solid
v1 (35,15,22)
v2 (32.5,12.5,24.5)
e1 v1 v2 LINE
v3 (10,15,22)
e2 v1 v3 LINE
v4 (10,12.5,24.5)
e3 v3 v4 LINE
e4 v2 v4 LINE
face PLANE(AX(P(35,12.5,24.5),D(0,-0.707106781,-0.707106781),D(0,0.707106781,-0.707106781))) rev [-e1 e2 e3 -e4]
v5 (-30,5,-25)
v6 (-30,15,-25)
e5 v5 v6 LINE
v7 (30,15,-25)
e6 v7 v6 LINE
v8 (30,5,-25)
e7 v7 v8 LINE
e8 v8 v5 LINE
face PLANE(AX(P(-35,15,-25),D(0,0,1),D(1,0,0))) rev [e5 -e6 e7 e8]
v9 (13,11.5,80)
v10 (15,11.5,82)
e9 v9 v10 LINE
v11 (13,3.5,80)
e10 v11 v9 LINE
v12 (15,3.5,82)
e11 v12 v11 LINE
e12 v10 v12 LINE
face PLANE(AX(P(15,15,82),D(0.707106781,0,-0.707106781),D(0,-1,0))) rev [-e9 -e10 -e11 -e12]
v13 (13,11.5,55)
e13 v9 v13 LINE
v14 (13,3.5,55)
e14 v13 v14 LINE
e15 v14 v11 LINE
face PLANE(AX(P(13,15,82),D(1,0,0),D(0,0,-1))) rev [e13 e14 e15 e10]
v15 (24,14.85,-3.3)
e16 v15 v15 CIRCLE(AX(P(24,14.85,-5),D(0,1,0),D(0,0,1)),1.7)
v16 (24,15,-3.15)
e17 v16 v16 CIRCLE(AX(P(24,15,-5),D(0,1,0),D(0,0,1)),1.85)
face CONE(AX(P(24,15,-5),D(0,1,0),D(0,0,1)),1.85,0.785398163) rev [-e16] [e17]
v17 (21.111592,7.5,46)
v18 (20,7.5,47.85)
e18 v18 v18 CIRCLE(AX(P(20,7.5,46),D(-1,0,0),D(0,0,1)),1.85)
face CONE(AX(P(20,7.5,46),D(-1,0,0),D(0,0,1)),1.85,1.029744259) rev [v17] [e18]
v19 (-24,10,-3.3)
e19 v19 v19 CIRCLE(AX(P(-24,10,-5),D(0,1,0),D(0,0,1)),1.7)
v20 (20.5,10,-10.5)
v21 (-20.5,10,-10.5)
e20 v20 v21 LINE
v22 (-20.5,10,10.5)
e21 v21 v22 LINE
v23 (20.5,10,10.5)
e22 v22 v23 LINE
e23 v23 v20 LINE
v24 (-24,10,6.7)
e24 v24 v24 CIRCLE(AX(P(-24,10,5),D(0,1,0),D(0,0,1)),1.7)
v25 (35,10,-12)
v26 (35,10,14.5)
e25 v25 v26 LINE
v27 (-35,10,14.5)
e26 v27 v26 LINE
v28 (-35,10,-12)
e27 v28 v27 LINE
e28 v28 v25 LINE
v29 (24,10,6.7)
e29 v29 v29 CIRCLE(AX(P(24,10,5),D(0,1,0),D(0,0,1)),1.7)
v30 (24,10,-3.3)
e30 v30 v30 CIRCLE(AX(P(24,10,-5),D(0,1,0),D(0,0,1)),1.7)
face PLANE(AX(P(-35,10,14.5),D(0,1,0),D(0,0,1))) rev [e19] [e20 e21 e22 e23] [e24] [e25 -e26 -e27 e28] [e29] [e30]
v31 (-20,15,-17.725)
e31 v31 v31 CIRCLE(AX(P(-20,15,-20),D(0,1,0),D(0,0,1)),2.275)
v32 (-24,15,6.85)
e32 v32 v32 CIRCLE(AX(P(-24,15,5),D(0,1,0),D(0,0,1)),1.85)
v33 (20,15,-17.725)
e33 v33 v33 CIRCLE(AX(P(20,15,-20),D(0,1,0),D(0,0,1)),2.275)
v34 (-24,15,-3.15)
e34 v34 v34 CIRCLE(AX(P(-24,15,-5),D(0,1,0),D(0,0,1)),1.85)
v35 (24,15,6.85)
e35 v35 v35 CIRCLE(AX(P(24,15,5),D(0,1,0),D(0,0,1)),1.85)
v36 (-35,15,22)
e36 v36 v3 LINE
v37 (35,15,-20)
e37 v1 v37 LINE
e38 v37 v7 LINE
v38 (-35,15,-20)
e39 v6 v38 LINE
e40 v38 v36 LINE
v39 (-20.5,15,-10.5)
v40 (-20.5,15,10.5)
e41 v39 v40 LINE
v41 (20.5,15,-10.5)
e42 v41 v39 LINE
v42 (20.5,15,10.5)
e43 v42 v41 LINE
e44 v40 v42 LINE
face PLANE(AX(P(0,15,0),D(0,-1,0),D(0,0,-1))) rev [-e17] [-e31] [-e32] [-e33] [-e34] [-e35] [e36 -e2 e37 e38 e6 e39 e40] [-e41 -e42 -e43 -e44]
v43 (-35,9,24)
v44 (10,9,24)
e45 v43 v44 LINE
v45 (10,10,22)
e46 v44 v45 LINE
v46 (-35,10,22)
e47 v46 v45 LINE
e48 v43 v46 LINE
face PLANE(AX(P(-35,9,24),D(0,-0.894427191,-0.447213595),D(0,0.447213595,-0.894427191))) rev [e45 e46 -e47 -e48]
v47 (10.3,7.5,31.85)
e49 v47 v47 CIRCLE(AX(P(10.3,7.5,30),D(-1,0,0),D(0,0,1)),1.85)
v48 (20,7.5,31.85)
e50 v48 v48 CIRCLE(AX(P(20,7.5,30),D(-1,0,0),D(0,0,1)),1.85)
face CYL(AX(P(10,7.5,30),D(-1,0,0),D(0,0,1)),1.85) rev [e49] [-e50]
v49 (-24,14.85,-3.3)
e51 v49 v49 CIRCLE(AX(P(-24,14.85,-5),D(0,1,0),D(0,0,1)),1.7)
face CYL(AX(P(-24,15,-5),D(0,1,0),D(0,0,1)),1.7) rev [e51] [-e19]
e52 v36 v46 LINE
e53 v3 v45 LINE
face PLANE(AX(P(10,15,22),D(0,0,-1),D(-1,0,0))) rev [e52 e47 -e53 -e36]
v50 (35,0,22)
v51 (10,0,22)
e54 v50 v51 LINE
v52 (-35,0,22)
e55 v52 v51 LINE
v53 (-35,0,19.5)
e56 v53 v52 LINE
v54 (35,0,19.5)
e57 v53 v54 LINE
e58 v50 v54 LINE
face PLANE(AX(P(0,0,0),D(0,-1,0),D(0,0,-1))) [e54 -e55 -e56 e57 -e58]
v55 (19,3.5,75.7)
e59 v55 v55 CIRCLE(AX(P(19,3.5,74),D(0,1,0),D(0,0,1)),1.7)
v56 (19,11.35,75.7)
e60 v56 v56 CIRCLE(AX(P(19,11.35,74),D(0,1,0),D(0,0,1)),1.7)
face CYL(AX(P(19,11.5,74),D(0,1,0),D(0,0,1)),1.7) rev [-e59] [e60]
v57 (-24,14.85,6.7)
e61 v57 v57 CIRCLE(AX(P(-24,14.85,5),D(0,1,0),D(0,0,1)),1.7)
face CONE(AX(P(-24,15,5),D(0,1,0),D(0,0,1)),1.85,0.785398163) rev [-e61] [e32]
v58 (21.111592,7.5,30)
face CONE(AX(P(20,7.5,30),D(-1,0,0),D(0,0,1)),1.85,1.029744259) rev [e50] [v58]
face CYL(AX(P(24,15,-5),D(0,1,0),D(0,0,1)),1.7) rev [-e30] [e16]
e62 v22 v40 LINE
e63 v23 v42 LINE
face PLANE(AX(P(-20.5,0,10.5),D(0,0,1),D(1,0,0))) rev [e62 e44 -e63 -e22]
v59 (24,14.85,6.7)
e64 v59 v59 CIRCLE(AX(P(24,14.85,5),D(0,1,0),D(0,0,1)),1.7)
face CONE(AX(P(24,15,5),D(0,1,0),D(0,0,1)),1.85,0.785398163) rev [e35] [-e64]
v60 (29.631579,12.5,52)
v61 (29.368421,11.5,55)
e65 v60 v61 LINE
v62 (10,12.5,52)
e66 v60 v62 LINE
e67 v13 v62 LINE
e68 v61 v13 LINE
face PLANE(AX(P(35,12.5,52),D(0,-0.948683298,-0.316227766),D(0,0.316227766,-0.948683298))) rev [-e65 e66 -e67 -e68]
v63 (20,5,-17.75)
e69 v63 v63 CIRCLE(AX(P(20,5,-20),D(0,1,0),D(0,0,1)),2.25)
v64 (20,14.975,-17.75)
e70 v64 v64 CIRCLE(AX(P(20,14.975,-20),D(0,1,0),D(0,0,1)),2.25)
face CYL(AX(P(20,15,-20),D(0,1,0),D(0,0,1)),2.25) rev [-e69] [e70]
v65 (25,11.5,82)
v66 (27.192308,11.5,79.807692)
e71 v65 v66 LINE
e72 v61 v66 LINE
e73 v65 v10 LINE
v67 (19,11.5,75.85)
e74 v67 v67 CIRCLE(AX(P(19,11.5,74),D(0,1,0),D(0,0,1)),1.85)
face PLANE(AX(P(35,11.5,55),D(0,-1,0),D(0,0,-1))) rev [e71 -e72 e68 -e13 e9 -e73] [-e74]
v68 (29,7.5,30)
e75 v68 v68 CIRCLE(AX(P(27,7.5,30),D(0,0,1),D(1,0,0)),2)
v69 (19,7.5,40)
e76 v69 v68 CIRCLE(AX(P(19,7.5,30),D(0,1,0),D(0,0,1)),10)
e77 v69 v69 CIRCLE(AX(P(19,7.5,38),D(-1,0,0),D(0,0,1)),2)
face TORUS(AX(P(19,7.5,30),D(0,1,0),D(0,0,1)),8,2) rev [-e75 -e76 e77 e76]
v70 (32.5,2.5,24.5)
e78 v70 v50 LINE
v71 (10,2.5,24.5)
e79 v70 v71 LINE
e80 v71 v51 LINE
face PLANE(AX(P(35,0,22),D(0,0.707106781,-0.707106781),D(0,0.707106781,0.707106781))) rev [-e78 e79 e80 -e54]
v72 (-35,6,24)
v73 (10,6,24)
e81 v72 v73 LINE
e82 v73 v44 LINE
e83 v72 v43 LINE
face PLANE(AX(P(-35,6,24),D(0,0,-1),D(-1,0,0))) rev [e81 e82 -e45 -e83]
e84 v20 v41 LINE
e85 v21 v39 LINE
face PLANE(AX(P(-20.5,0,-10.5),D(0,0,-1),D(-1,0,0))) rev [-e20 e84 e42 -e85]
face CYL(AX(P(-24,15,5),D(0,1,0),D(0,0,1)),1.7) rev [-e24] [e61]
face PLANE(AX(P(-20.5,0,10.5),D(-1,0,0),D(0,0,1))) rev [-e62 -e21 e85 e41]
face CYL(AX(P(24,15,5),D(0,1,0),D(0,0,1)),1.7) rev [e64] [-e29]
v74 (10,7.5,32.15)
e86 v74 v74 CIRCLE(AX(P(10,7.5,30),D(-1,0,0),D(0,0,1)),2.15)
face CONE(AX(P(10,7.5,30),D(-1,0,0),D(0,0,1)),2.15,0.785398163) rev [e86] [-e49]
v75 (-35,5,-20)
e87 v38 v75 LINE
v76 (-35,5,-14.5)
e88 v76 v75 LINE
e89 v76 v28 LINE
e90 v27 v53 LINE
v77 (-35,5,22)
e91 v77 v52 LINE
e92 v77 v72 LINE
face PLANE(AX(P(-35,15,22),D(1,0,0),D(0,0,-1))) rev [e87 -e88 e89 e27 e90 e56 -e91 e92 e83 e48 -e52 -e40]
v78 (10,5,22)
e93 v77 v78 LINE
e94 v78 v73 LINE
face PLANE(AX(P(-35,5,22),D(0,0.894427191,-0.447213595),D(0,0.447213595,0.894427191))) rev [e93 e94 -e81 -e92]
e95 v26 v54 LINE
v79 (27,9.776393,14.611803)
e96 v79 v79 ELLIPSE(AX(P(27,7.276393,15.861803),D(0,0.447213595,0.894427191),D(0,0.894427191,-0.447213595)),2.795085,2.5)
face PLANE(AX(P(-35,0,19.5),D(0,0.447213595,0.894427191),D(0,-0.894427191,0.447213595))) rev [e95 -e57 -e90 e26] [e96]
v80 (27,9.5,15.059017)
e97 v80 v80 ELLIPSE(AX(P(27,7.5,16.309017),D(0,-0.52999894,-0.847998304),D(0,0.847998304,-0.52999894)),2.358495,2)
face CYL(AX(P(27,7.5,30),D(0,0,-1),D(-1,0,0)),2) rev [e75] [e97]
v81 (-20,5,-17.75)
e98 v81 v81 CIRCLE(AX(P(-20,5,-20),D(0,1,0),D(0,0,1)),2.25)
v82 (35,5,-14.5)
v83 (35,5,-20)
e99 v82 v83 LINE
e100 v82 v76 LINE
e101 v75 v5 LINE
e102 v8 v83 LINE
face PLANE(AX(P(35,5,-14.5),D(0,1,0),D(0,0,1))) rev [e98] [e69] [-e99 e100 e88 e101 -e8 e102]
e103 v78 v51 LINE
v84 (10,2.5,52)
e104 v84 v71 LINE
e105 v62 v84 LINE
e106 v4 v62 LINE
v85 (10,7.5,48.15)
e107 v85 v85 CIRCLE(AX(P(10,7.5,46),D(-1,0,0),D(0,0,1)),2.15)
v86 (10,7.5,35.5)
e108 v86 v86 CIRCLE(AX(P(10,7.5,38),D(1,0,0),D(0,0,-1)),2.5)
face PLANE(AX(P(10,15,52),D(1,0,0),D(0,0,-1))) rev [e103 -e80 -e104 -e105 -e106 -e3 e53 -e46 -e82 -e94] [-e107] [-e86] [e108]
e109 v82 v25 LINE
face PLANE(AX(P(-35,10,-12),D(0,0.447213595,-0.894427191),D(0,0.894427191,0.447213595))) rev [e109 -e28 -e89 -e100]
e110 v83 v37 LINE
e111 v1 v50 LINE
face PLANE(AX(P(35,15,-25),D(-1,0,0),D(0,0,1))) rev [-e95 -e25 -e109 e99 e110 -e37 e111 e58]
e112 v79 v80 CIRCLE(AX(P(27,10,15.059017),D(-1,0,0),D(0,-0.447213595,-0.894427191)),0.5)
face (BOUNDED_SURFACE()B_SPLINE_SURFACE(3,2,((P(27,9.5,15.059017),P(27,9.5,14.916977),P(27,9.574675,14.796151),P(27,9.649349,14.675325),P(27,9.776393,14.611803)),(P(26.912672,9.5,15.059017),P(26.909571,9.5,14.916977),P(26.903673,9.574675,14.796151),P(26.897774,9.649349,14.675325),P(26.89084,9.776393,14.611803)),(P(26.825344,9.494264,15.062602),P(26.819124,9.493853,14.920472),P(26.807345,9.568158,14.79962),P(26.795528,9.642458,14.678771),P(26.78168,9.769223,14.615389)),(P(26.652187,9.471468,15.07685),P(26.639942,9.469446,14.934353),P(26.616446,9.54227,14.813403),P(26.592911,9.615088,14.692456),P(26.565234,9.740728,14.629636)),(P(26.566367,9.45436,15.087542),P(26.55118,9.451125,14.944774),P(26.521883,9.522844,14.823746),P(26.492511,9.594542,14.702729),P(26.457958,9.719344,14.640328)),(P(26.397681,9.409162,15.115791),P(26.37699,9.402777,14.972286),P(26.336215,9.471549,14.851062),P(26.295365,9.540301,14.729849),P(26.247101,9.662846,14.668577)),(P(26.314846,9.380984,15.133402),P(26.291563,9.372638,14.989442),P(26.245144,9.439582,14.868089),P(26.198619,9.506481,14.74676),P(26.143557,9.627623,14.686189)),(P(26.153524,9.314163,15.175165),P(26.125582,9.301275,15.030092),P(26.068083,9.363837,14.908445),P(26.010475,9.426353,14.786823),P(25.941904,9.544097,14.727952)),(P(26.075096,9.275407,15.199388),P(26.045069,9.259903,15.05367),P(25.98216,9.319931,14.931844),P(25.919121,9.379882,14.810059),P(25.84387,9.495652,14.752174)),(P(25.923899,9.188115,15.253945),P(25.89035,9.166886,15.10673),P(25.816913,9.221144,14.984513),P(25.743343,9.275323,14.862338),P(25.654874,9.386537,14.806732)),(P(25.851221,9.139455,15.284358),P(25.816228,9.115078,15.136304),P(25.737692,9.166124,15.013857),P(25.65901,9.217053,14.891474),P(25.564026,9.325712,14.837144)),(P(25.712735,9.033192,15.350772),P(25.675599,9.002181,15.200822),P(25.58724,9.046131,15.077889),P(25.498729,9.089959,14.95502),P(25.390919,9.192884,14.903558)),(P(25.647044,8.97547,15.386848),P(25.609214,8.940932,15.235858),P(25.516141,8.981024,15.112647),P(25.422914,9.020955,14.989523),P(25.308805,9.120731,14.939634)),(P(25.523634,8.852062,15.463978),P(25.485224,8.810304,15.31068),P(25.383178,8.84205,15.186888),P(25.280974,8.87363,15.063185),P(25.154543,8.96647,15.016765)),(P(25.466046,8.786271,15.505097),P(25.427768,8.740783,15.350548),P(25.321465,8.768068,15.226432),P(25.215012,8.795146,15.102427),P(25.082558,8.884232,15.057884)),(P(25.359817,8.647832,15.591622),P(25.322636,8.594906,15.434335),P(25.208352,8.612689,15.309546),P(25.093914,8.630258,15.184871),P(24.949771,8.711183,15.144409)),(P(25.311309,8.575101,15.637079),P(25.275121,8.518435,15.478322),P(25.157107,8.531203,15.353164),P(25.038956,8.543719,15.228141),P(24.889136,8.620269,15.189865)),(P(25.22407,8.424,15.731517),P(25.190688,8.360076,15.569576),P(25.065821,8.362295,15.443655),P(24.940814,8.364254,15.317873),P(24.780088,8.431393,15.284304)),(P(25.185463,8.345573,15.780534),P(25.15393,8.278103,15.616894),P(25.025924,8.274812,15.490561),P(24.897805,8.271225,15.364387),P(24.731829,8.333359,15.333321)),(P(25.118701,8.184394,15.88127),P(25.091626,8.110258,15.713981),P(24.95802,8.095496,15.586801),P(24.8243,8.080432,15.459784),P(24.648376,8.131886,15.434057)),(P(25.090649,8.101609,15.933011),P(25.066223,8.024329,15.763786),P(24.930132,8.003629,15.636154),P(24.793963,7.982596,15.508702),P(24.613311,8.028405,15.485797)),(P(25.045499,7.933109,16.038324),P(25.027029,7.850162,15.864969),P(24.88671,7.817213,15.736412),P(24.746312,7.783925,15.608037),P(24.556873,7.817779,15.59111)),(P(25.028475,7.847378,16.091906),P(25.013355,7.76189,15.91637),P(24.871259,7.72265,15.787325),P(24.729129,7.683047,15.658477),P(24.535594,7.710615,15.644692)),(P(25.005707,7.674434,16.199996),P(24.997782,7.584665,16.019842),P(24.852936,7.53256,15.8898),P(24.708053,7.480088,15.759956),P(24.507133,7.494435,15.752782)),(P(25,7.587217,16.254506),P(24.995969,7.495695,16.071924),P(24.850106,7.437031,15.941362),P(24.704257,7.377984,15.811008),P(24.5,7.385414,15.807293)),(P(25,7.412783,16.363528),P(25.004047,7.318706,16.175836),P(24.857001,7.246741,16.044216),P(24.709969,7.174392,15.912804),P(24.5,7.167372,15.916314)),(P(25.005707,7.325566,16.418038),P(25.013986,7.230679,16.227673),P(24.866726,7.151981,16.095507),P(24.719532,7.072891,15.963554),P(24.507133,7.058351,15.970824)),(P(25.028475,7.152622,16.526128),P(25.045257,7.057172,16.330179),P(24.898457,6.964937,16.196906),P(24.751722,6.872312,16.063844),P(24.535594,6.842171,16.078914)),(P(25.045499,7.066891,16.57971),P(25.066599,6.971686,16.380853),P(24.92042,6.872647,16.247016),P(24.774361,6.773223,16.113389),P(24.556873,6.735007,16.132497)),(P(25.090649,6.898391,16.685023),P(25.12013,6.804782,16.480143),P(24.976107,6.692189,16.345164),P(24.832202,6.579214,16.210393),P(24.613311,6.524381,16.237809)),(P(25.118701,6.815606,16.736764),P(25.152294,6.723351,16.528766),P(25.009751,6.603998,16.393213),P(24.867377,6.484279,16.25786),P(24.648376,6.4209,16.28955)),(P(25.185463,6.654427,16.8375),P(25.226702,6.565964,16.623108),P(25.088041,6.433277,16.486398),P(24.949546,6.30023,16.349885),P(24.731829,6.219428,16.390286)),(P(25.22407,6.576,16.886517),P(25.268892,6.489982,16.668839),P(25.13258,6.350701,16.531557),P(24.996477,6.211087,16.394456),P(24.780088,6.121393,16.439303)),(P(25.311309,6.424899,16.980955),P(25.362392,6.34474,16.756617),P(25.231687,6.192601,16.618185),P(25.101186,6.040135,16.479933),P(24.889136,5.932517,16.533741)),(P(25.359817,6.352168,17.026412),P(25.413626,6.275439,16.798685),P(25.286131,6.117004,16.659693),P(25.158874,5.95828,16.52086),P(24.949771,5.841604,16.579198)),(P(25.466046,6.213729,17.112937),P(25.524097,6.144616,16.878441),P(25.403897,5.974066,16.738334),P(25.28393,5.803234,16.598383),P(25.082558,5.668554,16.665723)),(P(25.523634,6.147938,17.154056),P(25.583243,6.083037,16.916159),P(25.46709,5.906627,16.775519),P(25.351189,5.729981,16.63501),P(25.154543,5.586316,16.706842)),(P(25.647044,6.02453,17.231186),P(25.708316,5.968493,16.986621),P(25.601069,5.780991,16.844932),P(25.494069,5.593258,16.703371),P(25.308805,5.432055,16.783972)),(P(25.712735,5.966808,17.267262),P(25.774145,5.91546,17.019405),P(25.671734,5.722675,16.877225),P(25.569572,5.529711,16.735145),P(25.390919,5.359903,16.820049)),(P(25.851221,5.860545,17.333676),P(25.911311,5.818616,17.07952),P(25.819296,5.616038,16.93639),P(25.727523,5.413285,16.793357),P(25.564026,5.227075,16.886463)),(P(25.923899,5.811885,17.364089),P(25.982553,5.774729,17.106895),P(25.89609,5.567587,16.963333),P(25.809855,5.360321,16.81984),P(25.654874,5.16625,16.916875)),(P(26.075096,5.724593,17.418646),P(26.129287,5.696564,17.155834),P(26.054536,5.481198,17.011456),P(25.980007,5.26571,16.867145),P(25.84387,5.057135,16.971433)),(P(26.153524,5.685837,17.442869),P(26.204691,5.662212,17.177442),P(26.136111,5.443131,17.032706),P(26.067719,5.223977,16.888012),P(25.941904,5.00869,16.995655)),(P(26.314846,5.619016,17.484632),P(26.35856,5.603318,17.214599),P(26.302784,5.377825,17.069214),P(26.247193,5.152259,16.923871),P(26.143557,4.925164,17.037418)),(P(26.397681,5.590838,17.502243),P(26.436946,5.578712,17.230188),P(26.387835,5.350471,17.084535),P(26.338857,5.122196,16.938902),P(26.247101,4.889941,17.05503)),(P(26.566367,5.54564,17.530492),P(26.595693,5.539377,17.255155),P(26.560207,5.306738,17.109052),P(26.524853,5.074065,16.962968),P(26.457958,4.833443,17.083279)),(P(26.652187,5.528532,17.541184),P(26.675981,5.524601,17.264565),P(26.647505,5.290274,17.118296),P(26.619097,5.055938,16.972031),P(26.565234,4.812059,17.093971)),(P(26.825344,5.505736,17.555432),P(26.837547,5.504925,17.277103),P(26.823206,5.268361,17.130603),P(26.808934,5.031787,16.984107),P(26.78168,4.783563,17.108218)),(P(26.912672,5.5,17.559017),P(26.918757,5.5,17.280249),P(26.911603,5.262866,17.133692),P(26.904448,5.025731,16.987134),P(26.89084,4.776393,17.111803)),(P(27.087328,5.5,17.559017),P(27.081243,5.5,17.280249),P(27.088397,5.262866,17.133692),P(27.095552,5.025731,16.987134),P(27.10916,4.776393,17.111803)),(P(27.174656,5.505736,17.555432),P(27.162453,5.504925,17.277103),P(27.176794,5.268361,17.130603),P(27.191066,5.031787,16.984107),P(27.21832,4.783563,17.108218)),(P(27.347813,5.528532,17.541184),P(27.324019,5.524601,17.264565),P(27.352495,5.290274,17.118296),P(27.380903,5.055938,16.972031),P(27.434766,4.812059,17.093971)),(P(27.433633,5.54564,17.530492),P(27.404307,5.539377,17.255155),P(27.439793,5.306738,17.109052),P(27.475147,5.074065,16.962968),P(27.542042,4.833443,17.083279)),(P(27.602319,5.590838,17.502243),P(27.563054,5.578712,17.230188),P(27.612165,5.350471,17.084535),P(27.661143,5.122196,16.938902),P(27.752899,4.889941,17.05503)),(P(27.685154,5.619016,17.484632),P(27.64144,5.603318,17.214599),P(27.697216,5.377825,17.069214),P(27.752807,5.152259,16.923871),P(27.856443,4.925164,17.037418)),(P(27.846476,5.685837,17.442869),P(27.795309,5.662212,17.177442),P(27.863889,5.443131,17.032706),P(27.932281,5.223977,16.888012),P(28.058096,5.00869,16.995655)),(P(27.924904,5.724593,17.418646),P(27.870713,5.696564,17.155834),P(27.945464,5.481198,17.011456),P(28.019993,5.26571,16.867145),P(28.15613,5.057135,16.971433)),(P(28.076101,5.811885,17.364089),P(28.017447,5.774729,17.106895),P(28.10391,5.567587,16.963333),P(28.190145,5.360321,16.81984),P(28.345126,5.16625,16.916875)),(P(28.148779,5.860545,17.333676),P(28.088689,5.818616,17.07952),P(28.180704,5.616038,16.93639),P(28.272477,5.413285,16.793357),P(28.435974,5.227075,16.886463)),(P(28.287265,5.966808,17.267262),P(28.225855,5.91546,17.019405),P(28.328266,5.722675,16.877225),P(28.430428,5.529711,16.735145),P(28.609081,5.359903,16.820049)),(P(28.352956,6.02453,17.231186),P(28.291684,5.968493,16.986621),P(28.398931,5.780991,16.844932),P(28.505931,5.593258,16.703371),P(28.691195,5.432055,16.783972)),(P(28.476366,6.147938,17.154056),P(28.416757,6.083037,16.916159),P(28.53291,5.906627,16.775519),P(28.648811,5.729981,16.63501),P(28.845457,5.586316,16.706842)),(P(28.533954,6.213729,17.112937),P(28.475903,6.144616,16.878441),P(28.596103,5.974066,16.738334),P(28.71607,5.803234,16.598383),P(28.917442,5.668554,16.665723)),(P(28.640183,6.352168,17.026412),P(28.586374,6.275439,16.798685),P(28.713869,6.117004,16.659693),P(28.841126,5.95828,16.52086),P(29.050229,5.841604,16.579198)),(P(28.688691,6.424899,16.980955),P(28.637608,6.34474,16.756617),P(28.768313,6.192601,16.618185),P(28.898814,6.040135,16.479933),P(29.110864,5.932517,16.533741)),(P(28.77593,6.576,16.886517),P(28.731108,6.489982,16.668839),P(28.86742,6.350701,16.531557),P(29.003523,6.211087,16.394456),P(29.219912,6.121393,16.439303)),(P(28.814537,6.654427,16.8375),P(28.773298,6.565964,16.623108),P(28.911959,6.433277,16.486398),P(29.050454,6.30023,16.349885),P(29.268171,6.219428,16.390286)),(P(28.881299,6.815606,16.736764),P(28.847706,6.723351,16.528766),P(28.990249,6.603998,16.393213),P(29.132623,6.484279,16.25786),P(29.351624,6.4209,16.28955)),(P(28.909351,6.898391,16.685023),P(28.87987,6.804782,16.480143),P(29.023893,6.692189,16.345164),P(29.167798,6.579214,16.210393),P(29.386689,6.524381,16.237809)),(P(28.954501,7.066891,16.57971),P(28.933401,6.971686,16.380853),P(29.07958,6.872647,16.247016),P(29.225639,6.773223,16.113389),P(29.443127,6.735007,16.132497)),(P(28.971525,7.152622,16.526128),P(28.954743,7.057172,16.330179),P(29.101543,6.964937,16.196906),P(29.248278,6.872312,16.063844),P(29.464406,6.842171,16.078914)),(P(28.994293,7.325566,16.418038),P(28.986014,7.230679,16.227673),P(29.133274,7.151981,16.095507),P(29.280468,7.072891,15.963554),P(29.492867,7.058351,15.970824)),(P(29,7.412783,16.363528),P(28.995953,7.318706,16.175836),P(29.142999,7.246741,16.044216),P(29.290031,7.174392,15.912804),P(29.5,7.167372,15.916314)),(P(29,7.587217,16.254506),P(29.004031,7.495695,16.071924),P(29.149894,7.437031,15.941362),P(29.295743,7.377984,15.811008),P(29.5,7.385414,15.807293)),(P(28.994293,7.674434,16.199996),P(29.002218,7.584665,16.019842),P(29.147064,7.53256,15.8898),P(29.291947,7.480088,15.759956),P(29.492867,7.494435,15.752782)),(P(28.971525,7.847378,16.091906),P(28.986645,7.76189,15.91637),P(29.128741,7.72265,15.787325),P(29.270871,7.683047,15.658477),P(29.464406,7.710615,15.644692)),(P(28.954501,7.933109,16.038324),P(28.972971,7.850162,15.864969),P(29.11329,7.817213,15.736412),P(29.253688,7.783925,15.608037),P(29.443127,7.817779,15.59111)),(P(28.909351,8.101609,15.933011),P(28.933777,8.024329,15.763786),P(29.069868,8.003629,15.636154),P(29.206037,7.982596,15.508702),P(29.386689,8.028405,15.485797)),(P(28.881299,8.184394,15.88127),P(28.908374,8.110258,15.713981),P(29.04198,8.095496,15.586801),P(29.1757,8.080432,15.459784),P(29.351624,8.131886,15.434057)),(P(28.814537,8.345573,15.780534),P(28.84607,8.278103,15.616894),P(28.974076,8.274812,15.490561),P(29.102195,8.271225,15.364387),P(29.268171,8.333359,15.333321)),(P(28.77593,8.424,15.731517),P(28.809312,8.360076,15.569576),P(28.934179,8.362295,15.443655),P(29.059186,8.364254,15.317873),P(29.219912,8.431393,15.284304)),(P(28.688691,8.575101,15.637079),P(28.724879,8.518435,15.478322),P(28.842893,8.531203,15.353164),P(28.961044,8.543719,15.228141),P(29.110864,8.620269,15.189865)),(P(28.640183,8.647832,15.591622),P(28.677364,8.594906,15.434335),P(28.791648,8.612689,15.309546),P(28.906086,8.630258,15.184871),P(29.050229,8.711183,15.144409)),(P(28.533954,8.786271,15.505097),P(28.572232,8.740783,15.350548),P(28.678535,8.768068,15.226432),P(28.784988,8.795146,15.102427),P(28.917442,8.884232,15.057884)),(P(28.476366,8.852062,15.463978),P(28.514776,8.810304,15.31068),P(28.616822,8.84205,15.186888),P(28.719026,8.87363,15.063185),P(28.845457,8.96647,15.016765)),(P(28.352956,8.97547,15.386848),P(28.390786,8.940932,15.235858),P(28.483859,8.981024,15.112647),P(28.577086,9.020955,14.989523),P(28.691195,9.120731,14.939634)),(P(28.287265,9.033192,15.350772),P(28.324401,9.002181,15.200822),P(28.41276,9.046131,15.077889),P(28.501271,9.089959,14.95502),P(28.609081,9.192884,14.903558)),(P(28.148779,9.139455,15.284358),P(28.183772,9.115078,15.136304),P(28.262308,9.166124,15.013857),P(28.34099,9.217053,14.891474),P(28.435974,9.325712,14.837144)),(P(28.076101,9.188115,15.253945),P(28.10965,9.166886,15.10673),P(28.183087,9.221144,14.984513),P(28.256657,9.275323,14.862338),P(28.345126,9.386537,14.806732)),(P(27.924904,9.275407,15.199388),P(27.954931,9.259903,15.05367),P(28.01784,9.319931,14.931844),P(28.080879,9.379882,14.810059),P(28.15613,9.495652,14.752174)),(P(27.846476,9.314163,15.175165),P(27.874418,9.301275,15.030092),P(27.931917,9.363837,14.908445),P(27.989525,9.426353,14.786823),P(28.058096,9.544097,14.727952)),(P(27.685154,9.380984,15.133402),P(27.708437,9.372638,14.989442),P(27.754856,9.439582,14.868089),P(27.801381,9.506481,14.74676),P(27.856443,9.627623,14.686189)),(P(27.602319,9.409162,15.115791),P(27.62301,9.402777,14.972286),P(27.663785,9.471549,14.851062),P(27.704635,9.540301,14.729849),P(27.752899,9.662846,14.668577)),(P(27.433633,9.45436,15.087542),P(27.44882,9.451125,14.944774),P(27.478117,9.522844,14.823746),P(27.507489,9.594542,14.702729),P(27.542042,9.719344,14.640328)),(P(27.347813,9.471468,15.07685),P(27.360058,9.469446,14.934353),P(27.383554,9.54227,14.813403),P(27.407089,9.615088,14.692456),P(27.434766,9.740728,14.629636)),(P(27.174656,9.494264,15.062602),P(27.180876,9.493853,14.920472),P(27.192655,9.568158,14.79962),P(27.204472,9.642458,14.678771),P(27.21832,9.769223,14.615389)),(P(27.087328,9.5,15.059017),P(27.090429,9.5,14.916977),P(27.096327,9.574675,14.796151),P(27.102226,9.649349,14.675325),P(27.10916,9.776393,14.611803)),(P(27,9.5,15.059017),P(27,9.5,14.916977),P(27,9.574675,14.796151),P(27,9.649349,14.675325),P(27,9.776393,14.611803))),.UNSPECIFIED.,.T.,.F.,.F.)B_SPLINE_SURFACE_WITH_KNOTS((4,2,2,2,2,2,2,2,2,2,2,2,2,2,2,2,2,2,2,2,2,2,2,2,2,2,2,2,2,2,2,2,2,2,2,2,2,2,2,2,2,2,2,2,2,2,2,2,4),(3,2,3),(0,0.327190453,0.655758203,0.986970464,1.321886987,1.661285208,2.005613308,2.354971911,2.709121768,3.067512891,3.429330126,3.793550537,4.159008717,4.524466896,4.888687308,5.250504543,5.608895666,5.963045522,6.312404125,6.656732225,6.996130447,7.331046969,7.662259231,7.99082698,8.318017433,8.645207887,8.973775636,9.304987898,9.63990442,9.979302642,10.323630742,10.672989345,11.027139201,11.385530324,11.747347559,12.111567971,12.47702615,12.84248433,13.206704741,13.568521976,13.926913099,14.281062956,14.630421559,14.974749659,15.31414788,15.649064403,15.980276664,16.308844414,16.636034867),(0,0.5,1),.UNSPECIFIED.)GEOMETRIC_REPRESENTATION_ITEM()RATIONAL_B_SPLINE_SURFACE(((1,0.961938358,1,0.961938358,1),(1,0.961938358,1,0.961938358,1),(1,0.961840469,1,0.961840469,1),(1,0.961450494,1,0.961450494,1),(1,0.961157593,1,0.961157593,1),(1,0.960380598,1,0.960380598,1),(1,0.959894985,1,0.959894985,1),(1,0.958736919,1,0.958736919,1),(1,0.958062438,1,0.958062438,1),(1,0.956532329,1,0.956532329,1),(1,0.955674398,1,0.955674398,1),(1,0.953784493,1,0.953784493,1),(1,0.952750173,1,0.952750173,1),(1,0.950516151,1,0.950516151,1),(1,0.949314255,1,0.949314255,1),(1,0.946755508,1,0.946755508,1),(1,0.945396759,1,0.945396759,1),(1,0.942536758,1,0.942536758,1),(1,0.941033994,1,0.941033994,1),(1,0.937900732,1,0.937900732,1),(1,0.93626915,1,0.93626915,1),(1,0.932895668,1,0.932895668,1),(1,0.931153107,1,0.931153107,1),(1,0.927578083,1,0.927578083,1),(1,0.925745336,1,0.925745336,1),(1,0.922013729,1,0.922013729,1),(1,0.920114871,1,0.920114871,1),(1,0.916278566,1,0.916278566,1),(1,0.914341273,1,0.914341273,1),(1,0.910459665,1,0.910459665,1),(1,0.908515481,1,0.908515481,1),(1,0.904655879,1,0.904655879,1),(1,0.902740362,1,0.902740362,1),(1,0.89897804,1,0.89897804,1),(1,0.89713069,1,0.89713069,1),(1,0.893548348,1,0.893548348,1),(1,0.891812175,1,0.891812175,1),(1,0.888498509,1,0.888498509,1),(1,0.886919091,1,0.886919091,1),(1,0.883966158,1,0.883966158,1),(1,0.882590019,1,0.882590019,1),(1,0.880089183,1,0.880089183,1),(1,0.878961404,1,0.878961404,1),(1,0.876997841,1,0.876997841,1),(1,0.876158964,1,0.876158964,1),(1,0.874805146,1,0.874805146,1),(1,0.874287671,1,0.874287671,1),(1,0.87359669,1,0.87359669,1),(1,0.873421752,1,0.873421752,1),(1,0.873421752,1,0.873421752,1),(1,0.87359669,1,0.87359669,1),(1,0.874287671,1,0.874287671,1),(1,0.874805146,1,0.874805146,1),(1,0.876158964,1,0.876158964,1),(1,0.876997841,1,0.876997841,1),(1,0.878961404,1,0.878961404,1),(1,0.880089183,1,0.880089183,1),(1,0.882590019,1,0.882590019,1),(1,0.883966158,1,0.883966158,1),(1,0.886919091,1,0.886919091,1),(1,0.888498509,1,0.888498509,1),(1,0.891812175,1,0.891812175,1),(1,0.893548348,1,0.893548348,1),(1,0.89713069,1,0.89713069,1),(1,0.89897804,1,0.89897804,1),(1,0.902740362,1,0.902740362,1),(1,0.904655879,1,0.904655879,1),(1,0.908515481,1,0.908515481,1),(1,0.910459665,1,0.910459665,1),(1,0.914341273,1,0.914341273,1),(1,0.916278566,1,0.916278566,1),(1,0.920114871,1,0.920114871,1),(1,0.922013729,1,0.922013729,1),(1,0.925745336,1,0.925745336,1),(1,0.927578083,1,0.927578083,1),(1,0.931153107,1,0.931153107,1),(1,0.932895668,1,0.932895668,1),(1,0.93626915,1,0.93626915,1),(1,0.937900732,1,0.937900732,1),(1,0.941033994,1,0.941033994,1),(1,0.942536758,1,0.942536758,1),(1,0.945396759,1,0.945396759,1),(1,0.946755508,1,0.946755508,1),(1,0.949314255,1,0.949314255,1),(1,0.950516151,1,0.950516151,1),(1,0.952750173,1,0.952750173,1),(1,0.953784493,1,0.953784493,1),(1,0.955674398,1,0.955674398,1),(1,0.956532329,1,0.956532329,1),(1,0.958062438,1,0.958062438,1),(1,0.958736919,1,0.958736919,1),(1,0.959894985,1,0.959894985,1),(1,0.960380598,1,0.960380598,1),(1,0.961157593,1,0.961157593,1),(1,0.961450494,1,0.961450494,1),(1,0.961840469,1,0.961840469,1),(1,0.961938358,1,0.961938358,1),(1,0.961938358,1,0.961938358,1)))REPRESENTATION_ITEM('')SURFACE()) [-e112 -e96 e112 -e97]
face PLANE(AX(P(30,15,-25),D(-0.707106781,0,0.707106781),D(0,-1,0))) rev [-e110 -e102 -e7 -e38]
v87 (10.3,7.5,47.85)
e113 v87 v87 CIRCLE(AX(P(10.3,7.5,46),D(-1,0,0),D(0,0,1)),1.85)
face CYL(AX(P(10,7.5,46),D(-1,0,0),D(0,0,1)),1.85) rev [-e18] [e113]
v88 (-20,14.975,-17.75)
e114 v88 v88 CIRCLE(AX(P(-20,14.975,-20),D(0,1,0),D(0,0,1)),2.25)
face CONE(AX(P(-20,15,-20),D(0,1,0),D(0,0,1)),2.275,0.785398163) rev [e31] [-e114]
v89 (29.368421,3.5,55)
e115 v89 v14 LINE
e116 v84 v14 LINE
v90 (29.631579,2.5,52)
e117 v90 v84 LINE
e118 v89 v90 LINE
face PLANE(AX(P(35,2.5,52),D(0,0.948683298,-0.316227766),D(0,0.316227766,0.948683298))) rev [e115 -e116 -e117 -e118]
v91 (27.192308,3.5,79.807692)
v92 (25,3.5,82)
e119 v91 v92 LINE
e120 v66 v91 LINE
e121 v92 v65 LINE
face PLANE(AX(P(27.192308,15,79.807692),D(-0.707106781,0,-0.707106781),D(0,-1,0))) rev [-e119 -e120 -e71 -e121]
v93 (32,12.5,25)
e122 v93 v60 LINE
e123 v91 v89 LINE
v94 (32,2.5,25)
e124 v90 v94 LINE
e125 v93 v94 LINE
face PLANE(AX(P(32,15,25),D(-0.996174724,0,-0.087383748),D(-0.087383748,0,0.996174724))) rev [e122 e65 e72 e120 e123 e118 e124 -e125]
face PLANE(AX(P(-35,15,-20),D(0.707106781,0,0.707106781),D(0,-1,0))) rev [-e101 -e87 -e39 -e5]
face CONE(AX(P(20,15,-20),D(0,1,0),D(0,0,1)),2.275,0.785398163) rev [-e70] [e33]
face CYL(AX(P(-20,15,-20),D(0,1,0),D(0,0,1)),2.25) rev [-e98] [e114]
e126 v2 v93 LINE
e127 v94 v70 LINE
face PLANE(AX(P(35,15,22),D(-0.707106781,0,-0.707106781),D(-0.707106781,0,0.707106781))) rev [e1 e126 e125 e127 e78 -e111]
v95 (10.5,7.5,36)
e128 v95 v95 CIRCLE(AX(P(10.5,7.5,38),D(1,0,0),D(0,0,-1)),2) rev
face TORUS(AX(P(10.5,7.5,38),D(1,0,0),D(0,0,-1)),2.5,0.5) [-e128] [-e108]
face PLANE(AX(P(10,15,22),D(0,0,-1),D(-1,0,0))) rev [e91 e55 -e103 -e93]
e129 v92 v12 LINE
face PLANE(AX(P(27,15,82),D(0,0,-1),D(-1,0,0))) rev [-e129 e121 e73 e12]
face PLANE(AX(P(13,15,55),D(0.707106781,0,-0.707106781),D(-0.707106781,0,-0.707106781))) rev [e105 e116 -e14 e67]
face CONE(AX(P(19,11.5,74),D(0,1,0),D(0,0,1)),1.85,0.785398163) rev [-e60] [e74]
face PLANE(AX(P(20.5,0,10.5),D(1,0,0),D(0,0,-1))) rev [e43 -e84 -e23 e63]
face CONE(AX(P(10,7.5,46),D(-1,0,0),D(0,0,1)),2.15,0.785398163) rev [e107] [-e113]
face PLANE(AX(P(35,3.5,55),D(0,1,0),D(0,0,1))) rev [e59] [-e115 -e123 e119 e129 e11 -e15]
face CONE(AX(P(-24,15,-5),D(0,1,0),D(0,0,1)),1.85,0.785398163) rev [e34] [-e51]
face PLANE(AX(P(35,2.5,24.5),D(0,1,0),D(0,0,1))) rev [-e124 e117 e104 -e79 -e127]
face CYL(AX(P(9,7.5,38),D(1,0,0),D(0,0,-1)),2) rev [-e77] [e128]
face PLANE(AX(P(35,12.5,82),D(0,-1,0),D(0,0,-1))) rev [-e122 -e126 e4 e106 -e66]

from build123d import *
from OCP.BRepFilletAPI import BRepFilletAPI_MakeChamfer

# Parameters (mm, degrees)
BODY_DEPTH                = 15
TONG_THINNING_CUT_DEPTH   = 95.731198662
LOWER_CUTOUT_DEPTH        = 109.853112036
SKETCH10_W                = 41
SKETCH10_H                = 21
SERVO_CUTOUT_DEPTH        = 91.410176418
SKETCH12_R                = 2
ROPE_TUNNEL_ROUNDS_R      = 0.5
TONG_CHAMFERS_SIZE        = 2
TONG_CHAMFERS_SIZE2       = 2.200726077
LARGER_CHAMFERS_SIZE      = 5
TONG_TIP_THINNER_DEPTH    = 95.73119871
TONG_TIP_HOLE_D           = 3.4
TONG_TIP_HOLE_CSINK_D     = 3.7
TONG_TIP_HOLE_CSINK_ANGLE = 90
GUIDING_RAIL_DEPTH        = 45
MOUTNING_FLATTENER_DEPTH  = 109.853112101


# Read off the part's stored shape, not the designer's step: guiding_screw_holes, servo_connector_holes, mouting_holes
with BuildPart() as part:
    # Sketch2 → body (new body)
    with BuildSketch(Plane(origin=(0, 0, 0), x_dir=(1, 0, 0), z_dir=(0, 1, 0))):
        Polygon((-35, 25), (35, 25), (35, -22), (32, -25), (27, -82), (13, -82), (13, -55), (10, -52), (10, -22), (-35, -22), align=None)
    extrude(amount=BODY_DEPTH)

    # Sketch3 → tong_thinning_cut (cut, through all)
    with BuildSketch(Plane.ZY.offset(-10)):
        Polygon((22, 15), (82, 15), (82, 12.5), (24.5, 12.5), align=None)
        Polygon((82, 0), (22, 0), (24.5, 2.5), (82, 2.5), align=None)
    extrude(amount=-TONG_THINNING_CUT_DEPTH, mode=Mode.SUBTRACT)

    # guiding_screw_holes outline → guiding_screw_holes (revolve, cut)
    with BuildSketch(Plane(origin=(0, 7.5, 46), x_dir=(0, 1, 0), z_dir=(0, 0, -1))):
        Polygon((1.85, 20), (0, 21.111592145), (0, 10), (2.15, 10), (1.85, 10.3), align=None)
    revolve(axis=Axis((0, 7.5, 46), (1, 0, 0)), mode=Mode.SUBTRACT)

    # guiding_screw_holes 2 outline → guiding_screw_holes 2 (revolve, cut)
    with BuildSketch(Plane(origin=(0, 7.5, 30), x_dir=(0, 1, 0), z_dir=(0, 0, -1))):
        Polygon((1.85, 20), (0, 21.111592145), (0, 10), (2.15, 10), (1.85, 10.3), align=None)
    revolve(axis=Axis((0, 7.5, 30), (1, 0, 0)), mode=Mode.SUBTRACT)

    # Sketch9 → lower_cutout (cut, through all)
    with BuildSketch(Plane(origin=(35, 0, 0), x_dir=(0, 0, -1), z_dir=(1, 0, 0))):
        Polygon((-19.5, 0), (-14.5, 10), (12, 10), (17, 0), align=None)
    extrude(amount=-LOWER_CUTOUT_DEPTH, mode=Mode.SUBTRACT)

    # Sketch10 → servo_cutout (cut, through all)
    with BuildSketch(Plane(origin=(0, 15, 0), x_dir=(1, 0, 0), z_dir=(0, 1, 0))):
        Rectangle(SKETCH10_W, SKETCH10_H)
    extrude(amount=-SERVO_CUTOUT_DEPTH, mode=Mode.SUBTRACT)

    # rope_tunnel_cutout: sweep along a path in Sketch11
    with BuildLine(Plane(origin=(0, 7.5, 0), x_dir=(1, 0, 0), z_dir=(0, 1, 0))) as rope_tunnel_cutout_path:
        Line((10, -38), (19, -38))
        ThreePointArc((19, -38), (24.656854249, -35.656854249), (27, -30))
        Line((27, -30), (27, -10))
    # Sketch12 → rope_tunnel_cutout (sweep, cut)
    with BuildSketch(Plane.ZY.offset(-10)):
        with Locations((38, 7.5)):
            Circle(SKETCH12_R)
    sweep(path=rope_tunnel_cutout_path.line, mode=Mode.SUBTRACT)

    # rope_tunnel_rounds
    rope_tunnel_rounds_edges = [part.edges().sort_by_distance(p)[0] for p in [
        (10, 7.5, 36),
        (25, 7.499978341, 15.750010829),
    ]]
    fillet(rope_tunnel_rounds_edges, radius=ROPE_TUNNEL_ROUNDS_R)

    # tong_chamfers: one chamfer whose edges measure the first distance from different faces: ONE call of the kernel's chamfer builder (chamfer() names one face for all edges)
    tong_chamfers_edges_1 = [part.edges().sort_by_distance(p)[0] for p in [
        (27, 7.5, 82),
    ]]
    tong_chamfers_side_1 = [part.faces().sort_by_distance(p)[0] for p in [
        (20, 7.5, 82),
    ]]
    tong_chamfers_edges_2 = [part.edges().sort_by_distance(p)[0] for p in [
        (13, 7.5, 82),
    ]]
    tong_chamfers = BRepFilletAPI_MakeChamfer(part.part.solid().wrapped)
    for e in tong_chamfers_edges_1:
        tong_chamfers.Add(TONG_CHAMFERS_SIZE, TONG_CHAMFERS_SIZE2, e.wrapped, tong_chamfers_side_1[0].wrapped)  # the first distance lies on this face
    for e in tong_chamfers_edges_2:
        tong_chamfers.Add(TONG_CHAMFERS_SIZE, e.wrapped)
    add(Compound.cast(tong_chamfers.Shape()), mode=Mode.REPLACE)

    # servo_connector_holes outline → servo_connector_holes (revolve, cut)
    with BuildSketch(Plane(origin=(24, 0, 5), x_dir=(1, 0, 0), z_dir=(0, 0, 1))):
        Polygon((0, 10), (1.7, 10), (1.7, 14.85), (1.85, 15), (0, 15), align=None)
    revolve(axis=Axis((24, 0, 5), (0, 1, 0)), mode=Mode.SUBTRACT)

    # servo_connector_holes 2 outline → servo_connector_holes 2 (revolve, cut)
    with BuildSketch(Plane(origin=(24, 0, -5), x_dir=(1, 0, 0), z_dir=(0, 0, 1))):
        Polygon((0, 10), (1.7, 10), (1.7, 14.85), (1.85, 15), (0, 15), align=None)
    revolve(axis=Axis((24, 0, -5), (0, 1, 0)), mode=Mode.SUBTRACT)

    # servo_connector_holes 3 outline → servo_connector_holes 3 (revolve, cut)
    with BuildSketch(Plane(origin=(-24, 0, 5), x_dir=(1, 0, 0), z_dir=(0, 0, 1))):
        Polygon((0, 10), (1.7, 10), (1.7, 14.85), (1.85, 15), (0, 15), align=None)
    revolve(axis=Axis((-24, 0, 5), (0, 1, 0)), mode=Mode.SUBTRACT)

    # servo_connector_holes 4 outline → servo_connector_holes 4 (revolve, cut)
    with BuildSketch(Plane(origin=(-24, 0, -5), x_dir=(1, 0, 0), z_dir=(0, 0, 1))):
        Polygon((0, 10), (1.7, 10), (1.7, 14.85), (1.85, 15), (0, 15), align=None)
    revolve(axis=Axis((-24, 0, -5), (0, 1, 0)), mode=Mode.SUBTRACT)

    # larger_chamfers
    larger_chamfers_edges = [part.edges().sort_by_distance(p)[0] for p in [
        (-35, 7.5, -25),
        (35, 7.5, -25),
    ]]
    chamfer(larger_chamfers_edges, length=LARGER_CHAMFERS_SIZE)

    # Sketch16 → tong_tip_thinner (cut, through all)
    with BuildSketch(Plane.ZY.offset(-10)):
        Polygon((52, 12.5), (55, 11.5), (82, 11.5), (82, 12.5), align=None)
        Polygon((52, 2.5), (55, 3.5), (82, 3.5), (82, 2.5), align=None)
    extrude(amount=-TONG_TIP_THINNER_DEPTH, mode=Mode.SUBTRACT)

    # tong_tip_hole (through all)
    with Locations(Plane(origin=(0, 11.5, 0), x_dir=(1, 0, 0), z_dir=(0, 1, 0))):
        with Locations((19, -74)):
            CounterSinkHole(TONG_TIP_HOLE_D / 2, TONG_TIP_HOLE_CSINK_D / 2, counter_sink_angle=TONG_TIP_HOLE_CSINK_ANGLE)

    # Sketch18 → guiding_rail (add)
    with BuildSketch(Plane.ZY.offset(-10)):
        Polygon((22, 10), (22, 5), (24, 6), (24, 9), align=None)
    extrude(amount=GUIDING_RAIL_DEPTH)

    # Sketch19 → moutning_flattener (cut, through all)
    with BuildSketch(Plane.ZY.offset(35)):
        Polygon((-14.5, 5), (-25, 5), (-25, 0), (-17, 0), align=None)
    extrude(amount=-MOUTNING_FLATTENER_DEPTH, mode=Mode.SUBTRACT)

    # mouting_holes outline → mouting_holes (revolve, cut)
    with BuildSketch(Plane(origin=(20, 0, -20), x_dir=(1, 0, 0), z_dir=(0, 0, 1))):
        Polygon((0, 5), (2.25, 5), (2.25, 14.975), (2.275, 15), (0, 15), align=None)
    revolve(axis=Axis((20, 0, -20), (0, 1, 0)), mode=Mode.SUBTRACT)

    # mouting_holes 2 outline → mouting_holes 2 (revolve, cut)
    with BuildSketch(Plane(origin=(-20, 0, -20), x_dir=(1, 0, 0), z_dir=(0, 0, 1))):
        Polygon((0, 5), (2.25, 5), (2.25, 14.975), (2.275, 15), (0, 15), align=None)
    revolve(axis=Axis((-20, 0, -20), (0, 1, 0)), mode=Mode.SUBTRACT)


solid = part.part
